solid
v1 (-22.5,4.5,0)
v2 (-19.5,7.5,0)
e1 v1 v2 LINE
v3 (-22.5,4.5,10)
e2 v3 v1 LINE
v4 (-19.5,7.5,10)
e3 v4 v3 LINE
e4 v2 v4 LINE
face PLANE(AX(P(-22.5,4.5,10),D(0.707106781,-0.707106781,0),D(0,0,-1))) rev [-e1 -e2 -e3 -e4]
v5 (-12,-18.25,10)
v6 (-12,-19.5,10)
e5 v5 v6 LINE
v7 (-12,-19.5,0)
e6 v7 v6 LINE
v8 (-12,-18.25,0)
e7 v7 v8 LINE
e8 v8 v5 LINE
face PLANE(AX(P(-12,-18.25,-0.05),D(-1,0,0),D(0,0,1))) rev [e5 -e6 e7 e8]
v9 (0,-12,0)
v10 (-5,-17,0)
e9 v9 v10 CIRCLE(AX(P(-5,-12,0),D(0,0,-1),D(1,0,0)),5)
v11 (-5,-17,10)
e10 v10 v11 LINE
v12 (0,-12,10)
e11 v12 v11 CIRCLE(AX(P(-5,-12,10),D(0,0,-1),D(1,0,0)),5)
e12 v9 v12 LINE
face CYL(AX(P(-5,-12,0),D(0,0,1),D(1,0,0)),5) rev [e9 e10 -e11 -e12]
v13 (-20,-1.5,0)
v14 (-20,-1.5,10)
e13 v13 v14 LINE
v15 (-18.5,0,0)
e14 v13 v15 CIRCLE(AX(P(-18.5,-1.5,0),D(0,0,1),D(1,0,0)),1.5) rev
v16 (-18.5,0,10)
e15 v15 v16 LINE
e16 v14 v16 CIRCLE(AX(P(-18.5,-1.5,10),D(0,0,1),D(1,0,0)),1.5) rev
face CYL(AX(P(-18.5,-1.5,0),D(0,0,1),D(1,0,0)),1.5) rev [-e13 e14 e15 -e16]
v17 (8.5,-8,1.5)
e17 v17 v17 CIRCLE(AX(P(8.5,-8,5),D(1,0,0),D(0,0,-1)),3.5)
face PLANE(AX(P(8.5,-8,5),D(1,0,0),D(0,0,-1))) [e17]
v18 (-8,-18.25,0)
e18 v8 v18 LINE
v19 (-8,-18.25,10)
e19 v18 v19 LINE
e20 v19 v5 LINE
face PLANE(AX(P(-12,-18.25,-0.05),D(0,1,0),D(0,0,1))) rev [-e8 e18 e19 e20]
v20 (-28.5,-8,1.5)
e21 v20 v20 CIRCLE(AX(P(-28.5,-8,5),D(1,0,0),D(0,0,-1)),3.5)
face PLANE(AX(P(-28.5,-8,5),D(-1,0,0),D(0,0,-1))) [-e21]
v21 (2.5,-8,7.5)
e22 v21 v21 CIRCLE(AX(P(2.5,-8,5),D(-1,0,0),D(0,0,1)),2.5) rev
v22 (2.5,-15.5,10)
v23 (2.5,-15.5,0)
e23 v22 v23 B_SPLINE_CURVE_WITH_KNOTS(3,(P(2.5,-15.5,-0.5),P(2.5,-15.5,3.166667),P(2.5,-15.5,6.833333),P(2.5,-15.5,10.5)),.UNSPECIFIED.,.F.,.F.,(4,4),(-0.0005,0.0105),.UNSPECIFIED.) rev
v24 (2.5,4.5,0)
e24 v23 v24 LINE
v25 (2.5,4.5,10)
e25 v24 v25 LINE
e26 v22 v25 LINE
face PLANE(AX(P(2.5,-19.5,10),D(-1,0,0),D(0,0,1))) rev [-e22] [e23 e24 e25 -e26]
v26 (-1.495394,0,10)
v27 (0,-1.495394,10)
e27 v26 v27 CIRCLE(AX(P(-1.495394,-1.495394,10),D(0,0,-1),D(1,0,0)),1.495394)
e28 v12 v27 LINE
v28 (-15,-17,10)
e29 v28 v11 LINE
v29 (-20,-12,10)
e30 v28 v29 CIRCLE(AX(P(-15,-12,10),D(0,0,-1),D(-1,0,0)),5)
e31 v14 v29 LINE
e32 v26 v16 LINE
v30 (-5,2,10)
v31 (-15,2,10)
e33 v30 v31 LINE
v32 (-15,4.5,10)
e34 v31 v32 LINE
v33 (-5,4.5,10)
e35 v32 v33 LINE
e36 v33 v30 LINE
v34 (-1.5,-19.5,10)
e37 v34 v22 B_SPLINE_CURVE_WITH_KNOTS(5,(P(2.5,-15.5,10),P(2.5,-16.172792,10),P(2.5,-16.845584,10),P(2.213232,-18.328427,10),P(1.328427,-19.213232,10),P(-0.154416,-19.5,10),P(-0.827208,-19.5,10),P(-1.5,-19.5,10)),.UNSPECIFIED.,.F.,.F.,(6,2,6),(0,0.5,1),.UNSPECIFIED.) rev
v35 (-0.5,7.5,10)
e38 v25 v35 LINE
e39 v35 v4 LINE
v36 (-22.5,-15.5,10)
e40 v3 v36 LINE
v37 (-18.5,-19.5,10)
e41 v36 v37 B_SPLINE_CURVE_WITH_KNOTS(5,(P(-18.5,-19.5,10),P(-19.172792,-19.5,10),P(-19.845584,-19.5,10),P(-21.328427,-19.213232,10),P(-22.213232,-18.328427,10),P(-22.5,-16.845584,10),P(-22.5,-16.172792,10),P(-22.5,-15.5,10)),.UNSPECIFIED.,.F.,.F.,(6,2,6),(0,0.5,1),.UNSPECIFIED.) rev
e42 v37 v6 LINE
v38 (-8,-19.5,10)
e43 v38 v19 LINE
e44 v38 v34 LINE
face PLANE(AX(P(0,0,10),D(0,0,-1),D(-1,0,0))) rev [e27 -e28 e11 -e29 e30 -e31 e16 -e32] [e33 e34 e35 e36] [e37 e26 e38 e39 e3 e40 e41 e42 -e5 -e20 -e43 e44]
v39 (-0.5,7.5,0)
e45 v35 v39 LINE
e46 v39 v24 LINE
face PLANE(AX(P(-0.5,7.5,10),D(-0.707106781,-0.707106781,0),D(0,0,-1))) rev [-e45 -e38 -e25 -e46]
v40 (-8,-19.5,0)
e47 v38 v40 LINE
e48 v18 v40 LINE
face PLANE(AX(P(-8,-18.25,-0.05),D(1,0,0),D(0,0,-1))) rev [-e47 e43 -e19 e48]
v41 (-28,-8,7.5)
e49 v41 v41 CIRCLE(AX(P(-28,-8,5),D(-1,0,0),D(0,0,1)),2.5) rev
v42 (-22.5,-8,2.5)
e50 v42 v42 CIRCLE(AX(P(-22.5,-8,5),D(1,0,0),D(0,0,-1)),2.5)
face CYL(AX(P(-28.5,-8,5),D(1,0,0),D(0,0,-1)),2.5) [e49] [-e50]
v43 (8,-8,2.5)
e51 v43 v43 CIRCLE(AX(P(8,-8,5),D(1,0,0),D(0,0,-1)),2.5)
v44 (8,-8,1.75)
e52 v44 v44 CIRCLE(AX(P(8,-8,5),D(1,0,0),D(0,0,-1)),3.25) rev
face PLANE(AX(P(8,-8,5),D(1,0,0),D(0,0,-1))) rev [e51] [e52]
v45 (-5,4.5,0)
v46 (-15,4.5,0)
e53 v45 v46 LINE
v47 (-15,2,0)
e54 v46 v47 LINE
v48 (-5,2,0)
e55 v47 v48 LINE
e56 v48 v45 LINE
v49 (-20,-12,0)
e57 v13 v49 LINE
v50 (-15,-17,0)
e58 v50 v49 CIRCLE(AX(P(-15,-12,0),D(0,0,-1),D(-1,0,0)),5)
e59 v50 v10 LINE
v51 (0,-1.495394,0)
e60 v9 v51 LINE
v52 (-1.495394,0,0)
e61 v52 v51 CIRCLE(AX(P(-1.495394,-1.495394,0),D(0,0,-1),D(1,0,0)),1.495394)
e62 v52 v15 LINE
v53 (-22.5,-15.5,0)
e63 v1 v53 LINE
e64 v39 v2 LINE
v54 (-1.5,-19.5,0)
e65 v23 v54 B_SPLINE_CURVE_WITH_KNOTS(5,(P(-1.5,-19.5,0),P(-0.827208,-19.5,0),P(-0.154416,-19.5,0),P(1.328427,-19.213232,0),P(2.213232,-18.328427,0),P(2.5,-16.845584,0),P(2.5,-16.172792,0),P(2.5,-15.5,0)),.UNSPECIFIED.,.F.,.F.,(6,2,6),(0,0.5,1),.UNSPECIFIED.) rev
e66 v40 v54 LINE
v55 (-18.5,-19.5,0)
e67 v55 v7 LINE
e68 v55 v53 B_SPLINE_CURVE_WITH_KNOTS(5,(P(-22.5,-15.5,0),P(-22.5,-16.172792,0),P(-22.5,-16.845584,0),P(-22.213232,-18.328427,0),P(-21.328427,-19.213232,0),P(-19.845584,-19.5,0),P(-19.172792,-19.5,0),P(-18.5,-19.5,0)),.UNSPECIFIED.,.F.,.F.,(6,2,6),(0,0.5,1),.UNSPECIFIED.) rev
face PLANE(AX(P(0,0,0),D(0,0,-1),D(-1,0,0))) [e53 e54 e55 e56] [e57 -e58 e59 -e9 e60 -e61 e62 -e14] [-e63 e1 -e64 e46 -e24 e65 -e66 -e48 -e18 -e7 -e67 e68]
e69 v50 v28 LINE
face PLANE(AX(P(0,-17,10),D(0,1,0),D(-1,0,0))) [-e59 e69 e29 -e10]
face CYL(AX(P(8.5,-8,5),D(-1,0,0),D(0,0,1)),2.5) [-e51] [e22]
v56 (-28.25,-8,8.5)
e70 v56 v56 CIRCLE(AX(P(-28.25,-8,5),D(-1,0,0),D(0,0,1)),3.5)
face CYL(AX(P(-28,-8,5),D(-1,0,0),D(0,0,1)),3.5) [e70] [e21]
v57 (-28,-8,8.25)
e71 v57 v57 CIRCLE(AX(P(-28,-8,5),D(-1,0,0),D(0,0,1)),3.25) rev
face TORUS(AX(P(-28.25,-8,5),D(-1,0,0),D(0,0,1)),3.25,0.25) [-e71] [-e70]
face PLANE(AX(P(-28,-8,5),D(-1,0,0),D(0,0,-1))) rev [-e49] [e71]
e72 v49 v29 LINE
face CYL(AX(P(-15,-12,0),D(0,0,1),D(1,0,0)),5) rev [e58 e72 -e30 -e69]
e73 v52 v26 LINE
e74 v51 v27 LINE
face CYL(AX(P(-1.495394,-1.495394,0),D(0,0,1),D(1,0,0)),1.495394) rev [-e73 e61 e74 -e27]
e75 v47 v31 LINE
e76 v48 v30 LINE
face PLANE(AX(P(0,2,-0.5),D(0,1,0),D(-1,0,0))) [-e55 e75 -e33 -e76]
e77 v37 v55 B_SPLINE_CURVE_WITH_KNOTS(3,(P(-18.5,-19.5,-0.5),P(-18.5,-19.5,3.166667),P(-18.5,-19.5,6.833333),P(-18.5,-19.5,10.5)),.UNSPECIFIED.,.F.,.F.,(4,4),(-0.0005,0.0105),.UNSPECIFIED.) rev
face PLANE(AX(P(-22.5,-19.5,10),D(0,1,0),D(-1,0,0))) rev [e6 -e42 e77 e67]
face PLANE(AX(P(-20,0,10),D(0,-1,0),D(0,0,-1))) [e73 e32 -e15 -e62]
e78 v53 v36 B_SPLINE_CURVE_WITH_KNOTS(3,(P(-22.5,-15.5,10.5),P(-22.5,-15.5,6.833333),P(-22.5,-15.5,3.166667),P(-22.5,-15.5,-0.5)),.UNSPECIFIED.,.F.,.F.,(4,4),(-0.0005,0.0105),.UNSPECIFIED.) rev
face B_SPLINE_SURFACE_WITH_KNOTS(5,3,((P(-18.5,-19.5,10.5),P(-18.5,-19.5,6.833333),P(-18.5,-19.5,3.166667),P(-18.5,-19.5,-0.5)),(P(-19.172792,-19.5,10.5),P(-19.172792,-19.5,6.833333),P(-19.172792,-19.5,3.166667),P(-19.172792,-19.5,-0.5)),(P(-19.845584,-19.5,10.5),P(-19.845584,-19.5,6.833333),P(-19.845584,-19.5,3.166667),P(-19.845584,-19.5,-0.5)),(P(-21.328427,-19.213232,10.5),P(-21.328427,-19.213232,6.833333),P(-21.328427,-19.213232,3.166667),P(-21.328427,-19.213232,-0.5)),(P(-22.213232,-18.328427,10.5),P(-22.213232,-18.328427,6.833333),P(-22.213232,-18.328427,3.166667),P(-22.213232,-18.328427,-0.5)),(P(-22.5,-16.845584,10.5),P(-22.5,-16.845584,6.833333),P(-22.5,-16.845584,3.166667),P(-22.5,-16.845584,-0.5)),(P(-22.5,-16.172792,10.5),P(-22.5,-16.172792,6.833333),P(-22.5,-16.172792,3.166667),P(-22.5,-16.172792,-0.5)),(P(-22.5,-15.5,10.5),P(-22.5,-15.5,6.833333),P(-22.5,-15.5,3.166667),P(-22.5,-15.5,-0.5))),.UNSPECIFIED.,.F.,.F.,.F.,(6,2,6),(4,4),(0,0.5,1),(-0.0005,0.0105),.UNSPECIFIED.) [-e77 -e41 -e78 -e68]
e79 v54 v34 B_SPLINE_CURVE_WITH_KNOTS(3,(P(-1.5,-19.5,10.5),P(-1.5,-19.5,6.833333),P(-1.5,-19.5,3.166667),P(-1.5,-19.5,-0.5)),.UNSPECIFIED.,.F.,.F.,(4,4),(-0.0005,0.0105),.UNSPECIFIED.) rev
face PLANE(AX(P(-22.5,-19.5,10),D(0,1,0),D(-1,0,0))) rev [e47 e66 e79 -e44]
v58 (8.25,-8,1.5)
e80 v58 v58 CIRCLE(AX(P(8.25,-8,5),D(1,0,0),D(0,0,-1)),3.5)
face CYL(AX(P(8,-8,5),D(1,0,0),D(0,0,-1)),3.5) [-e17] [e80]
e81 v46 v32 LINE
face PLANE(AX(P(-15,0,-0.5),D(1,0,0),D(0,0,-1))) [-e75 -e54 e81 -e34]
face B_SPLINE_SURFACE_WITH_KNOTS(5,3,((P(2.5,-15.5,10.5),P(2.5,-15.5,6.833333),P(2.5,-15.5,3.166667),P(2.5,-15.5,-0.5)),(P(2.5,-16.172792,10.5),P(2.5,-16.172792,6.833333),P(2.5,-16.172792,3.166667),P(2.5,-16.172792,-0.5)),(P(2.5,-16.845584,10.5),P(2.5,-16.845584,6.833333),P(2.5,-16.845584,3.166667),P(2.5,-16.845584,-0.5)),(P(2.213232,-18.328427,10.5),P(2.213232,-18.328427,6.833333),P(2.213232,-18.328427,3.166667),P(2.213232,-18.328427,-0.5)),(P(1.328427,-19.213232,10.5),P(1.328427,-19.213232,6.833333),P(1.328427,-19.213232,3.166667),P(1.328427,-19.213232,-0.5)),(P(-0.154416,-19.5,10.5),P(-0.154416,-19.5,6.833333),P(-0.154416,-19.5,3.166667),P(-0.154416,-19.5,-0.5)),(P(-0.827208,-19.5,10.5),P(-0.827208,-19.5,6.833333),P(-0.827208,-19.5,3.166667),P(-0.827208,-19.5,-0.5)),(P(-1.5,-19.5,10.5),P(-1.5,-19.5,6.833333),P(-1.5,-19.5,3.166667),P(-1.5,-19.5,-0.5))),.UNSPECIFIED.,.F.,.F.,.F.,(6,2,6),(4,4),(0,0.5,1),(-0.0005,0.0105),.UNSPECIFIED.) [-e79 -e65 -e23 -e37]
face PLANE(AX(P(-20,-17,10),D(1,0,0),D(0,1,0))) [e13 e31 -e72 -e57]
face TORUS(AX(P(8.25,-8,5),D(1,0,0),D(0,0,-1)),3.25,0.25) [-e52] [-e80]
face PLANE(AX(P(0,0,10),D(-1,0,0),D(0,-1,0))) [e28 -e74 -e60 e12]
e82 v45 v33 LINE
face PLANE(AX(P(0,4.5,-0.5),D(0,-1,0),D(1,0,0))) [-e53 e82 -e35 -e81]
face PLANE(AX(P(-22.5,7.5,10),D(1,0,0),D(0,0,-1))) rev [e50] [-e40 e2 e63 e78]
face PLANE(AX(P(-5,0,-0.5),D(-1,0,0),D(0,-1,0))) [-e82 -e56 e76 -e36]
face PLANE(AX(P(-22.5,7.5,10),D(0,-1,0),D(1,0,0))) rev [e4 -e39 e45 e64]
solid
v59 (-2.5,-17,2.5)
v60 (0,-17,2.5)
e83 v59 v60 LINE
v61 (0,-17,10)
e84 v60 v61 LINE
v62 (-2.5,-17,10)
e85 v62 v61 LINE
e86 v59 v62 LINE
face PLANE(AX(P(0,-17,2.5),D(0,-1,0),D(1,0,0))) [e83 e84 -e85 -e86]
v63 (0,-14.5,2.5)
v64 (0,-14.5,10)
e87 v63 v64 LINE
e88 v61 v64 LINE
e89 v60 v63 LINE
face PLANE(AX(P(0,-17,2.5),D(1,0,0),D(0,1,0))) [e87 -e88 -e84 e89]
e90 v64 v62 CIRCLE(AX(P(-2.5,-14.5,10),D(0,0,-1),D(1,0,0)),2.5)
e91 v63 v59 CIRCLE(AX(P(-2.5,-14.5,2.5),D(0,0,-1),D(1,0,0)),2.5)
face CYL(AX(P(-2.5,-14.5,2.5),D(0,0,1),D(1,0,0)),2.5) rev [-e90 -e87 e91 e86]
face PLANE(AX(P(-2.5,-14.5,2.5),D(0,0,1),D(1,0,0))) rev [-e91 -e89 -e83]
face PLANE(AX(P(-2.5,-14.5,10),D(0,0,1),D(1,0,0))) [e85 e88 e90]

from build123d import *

# Parameters (mm, degrees)
SKETCH1_W            = 25
SKETCH1_H            = 27
SKETCH1_W_2          = 20
SKETCH1_H_2          = 17
BOSS_EXTRUDE1_DEPTH  = 10
FILLET1_SIZE         = 4
BOSS_EXTRUDE2_DEPTH  = 10
BOSS_EXTRUDE3_DEPTH  = 10
BOSS_EXTRUDE4_DEPTH  = 7.5
BOSS_EXTRUDE5_DEPTH  = 10
CHAMFER1_SIZE        = 3
SKETCH8_W            = 10
SKETCH8_H            = 2.5
CUT_EXTRUDE1_DEPTH   = 10.5
SKETCH19_W           = 4
SKETCH19_H           = 1.25
CUT_EXTRUDE5_DEPTH   = 32.408597715
SKETCH20_R           = 2.5
BOSS_EXTRUDE10_DEPTH = 6
SKETCH21_R           = 3.5
BOSS_EXTRUDE11_DEPTH = 0.5
FILLET2_R            = 0.25
FILLET3_R            = 0.25


with BuildPart() as part:
    # Sketch1 → Boss-Extrude1 (new body)
    with BuildSketch(Plane.XY):
        with Locations((-10, -6)):
            Rectangle(SKETCH1_W, SKETCH1_H)
        with Locations((-10, -8.5)):
            Rectangle(SKETCH1_W_2, SKETCH1_H_2, mode=Mode.SUBTRACT)
    extrude(amount=BOSS_EXTRUDE1_DEPTH)

    # Fillet1
    # a fillet whose section is not a circle: 4 mm, written as the material it takes off along each edge
    with BuildSketch(Plane(origin=(-22.5, -19.5, -10), x_dir=(0, 1, 0), z_dir=(0, 0, 1)), Plane(origin=(2.5, -19.5, -10), x_dir=(-1, 0, 0), z_dir=(0, 0, 1))) as fillet1_piece_1:
        with BuildLine():
            add(Edge.make_bspline([(FILLET1_SIZE, 0), (FILLET1_SIZE * 0.831801948466, 0), (FILLET1_SIZE * 0.663603896932, 0), (FILLET1_SIZE * 0.292893218813, -FILLET1_SIZE * 0.0716919198361), (FILLET1_SIZE * 0.0716919198361, -FILLET1_SIZE * 0.292893218813), (0, -FILLET1_SIZE * 0.663603896932), (0, -FILLET1_SIZE * 0.831801948466), (0, -FILLET1_SIZE)], knots=[0, 0, 0, 0, 0, 0, 0.5, 0.5, 1, 1, 1, 1, 1, 1], degree=5))
            Line((0, -FILLET1_SIZE), (0, 0))
            Line((0, 0), (FILLET1_SIZE, 0))
        make_face()
    extrude(amount=30, mode=Mode.SUBTRACT)

    # Sketch3 → Boss-Extrude2 (add)
    with BuildSketch(Plane.XY.offset(10)):
        with BuildLine():
            Line((-18.5, 0), (-20, 0))
            Line((-20, 0), (-20, -1.5))
            ThreePointArc((-20, -1.5), (-19.560660172, -0.439339828), (-18.5, 0))
        make_face()
    extrude(amount=-BOSS_EXTRUDE2_DEPTH)

    # Sketch4 → Boss-Extrude3 (add)
    with BuildSketch(Plane.XY.offset(10)):
        with BuildLine():
            Line((0, 0), (0, -1.495394009))
            ThreePointArc((0, -1.495394009), (-0.437990765, -0.437990765), (-1.495394009, 0))
            Line((-1.495394009, 0), (0, 0))
        make_face()
    extrude(amount=-BOSS_EXTRUDE3_DEPTH)

    # Sketch7 → Boss-Extrude5 (add)
    with BuildSketch(Plane.XY.offset(10)):
        with BuildLine():
            Line((-20, -17), (-15, -17))
            ThreePointArc((-15, -17), (-18.535533906, -15.535533906), (-20, -12))
            Line((-20, -12), (-20, -17))
        make_face()
        with BuildLine():
            Line((0, -17), (-5, -17))
            ThreePointArc((-5, -17), (-1.464466094, -15.535533906), (0, -12))
            Line((0, -12), (0, -17))
        make_face()
    extrude(amount=-BOSS_EXTRUDE5_DEPTH)

    # Chamfer1
    chamfer1_edges = [part.edges().sort_by_distance(p)[0] for p in [
        (2.5, 7.5, 5),
        (-22.5, 7.5, 5),
    ]]
    chamfer(chamfer1_edges, length=CHAMFER1_SIZE)

    # Sketch8 → Cut-Extrude1 (cut)
    with BuildSketch(Plane.XY.offset(10)):
        with Locations((-10, 3.25)):
            Rectangle(SKETCH8_W, SKETCH8_H)
    extrude(amount=-CUT_EXTRUDE1_DEPTH, mode=Mode.SUBTRACT)

    # Sketch19 → Cut-Extrude5 (cut, through all)
    with BuildSketch(Plane.XY.offset(10)):
        with Locations((-10, -18.875)):
            Rectangle(SKETCH19_W, SKETCH19_H)
    extrude(amount=-CUT_EXTRUDE5_DEPTH, mode=Mode.SUBTRACT)

    # Sketch20 → Boss-Extrude10 (add)
    with BuildSketch(Plane(origin=(2.5, 0, 0), x_dir=(0, 0, -1), z_dir=(1, 0, 0))):
        with Locations(Location((-5, -8, 0), (0, 0, 180))):
            Circle(SKETCH20_R)
    boss_extrude10 = extrude(amount=BOSS_EXTRUDE10_DEPTH)

    # Sketch21 → Boss-Extrude11 (add)
    with BuildSketch(Plane(origin=(8.5, 0, 0), x_dir=(0, 0, -1), z_dir=(1, 0, 0))):
        with Locations((-5, -8)):
            Circle(SKETCH21_R)
    boss_extrude11 = extrude(amount=-BOSS_EXTRUDE11_DEPTH)

    # Fillet2
    fillet2_edges = [part.edges().sort_by_distance(p)[0] for p in [
        (8, -8, 8.5),
    ]]
    fillet(fillet2_edges, radius=FILLET2_R)

    # Mirror1: Boss-Extrude10, Boss-Extrude11 across plane
    add(boss_extrude10.mirror(Plane.ZY.offset(10)))
    add(boss_extrude11.mirror(Plane.ZY.offset(10)))

    # Fillet3
    fillet3_edges = [part.edges().sort_by_distance(p)[0] for p in [
        (-28, -8, 8.5),
    ]]
    fillet(fillet3_edges, radius=FILLET3_R)


with BuildPart() as body_2:
    # Sketch6 → Boss-Extrude4 (new body)
    with BuildSketch(Plane.XY.offset(10)):
        with BuildLine():
            Line((0, -17), (0, -14.5))
            ThreePointArc((0, -14.5), (-0.732233047, -16.267766953), (-2.5, -17))
            Line((-2.5, -17), (0, -17))
        make_face()
    extrude(amount=-BOSS_EXTRUDE4_DEPTH)


solid = Compound([part.part, body_2.part])
